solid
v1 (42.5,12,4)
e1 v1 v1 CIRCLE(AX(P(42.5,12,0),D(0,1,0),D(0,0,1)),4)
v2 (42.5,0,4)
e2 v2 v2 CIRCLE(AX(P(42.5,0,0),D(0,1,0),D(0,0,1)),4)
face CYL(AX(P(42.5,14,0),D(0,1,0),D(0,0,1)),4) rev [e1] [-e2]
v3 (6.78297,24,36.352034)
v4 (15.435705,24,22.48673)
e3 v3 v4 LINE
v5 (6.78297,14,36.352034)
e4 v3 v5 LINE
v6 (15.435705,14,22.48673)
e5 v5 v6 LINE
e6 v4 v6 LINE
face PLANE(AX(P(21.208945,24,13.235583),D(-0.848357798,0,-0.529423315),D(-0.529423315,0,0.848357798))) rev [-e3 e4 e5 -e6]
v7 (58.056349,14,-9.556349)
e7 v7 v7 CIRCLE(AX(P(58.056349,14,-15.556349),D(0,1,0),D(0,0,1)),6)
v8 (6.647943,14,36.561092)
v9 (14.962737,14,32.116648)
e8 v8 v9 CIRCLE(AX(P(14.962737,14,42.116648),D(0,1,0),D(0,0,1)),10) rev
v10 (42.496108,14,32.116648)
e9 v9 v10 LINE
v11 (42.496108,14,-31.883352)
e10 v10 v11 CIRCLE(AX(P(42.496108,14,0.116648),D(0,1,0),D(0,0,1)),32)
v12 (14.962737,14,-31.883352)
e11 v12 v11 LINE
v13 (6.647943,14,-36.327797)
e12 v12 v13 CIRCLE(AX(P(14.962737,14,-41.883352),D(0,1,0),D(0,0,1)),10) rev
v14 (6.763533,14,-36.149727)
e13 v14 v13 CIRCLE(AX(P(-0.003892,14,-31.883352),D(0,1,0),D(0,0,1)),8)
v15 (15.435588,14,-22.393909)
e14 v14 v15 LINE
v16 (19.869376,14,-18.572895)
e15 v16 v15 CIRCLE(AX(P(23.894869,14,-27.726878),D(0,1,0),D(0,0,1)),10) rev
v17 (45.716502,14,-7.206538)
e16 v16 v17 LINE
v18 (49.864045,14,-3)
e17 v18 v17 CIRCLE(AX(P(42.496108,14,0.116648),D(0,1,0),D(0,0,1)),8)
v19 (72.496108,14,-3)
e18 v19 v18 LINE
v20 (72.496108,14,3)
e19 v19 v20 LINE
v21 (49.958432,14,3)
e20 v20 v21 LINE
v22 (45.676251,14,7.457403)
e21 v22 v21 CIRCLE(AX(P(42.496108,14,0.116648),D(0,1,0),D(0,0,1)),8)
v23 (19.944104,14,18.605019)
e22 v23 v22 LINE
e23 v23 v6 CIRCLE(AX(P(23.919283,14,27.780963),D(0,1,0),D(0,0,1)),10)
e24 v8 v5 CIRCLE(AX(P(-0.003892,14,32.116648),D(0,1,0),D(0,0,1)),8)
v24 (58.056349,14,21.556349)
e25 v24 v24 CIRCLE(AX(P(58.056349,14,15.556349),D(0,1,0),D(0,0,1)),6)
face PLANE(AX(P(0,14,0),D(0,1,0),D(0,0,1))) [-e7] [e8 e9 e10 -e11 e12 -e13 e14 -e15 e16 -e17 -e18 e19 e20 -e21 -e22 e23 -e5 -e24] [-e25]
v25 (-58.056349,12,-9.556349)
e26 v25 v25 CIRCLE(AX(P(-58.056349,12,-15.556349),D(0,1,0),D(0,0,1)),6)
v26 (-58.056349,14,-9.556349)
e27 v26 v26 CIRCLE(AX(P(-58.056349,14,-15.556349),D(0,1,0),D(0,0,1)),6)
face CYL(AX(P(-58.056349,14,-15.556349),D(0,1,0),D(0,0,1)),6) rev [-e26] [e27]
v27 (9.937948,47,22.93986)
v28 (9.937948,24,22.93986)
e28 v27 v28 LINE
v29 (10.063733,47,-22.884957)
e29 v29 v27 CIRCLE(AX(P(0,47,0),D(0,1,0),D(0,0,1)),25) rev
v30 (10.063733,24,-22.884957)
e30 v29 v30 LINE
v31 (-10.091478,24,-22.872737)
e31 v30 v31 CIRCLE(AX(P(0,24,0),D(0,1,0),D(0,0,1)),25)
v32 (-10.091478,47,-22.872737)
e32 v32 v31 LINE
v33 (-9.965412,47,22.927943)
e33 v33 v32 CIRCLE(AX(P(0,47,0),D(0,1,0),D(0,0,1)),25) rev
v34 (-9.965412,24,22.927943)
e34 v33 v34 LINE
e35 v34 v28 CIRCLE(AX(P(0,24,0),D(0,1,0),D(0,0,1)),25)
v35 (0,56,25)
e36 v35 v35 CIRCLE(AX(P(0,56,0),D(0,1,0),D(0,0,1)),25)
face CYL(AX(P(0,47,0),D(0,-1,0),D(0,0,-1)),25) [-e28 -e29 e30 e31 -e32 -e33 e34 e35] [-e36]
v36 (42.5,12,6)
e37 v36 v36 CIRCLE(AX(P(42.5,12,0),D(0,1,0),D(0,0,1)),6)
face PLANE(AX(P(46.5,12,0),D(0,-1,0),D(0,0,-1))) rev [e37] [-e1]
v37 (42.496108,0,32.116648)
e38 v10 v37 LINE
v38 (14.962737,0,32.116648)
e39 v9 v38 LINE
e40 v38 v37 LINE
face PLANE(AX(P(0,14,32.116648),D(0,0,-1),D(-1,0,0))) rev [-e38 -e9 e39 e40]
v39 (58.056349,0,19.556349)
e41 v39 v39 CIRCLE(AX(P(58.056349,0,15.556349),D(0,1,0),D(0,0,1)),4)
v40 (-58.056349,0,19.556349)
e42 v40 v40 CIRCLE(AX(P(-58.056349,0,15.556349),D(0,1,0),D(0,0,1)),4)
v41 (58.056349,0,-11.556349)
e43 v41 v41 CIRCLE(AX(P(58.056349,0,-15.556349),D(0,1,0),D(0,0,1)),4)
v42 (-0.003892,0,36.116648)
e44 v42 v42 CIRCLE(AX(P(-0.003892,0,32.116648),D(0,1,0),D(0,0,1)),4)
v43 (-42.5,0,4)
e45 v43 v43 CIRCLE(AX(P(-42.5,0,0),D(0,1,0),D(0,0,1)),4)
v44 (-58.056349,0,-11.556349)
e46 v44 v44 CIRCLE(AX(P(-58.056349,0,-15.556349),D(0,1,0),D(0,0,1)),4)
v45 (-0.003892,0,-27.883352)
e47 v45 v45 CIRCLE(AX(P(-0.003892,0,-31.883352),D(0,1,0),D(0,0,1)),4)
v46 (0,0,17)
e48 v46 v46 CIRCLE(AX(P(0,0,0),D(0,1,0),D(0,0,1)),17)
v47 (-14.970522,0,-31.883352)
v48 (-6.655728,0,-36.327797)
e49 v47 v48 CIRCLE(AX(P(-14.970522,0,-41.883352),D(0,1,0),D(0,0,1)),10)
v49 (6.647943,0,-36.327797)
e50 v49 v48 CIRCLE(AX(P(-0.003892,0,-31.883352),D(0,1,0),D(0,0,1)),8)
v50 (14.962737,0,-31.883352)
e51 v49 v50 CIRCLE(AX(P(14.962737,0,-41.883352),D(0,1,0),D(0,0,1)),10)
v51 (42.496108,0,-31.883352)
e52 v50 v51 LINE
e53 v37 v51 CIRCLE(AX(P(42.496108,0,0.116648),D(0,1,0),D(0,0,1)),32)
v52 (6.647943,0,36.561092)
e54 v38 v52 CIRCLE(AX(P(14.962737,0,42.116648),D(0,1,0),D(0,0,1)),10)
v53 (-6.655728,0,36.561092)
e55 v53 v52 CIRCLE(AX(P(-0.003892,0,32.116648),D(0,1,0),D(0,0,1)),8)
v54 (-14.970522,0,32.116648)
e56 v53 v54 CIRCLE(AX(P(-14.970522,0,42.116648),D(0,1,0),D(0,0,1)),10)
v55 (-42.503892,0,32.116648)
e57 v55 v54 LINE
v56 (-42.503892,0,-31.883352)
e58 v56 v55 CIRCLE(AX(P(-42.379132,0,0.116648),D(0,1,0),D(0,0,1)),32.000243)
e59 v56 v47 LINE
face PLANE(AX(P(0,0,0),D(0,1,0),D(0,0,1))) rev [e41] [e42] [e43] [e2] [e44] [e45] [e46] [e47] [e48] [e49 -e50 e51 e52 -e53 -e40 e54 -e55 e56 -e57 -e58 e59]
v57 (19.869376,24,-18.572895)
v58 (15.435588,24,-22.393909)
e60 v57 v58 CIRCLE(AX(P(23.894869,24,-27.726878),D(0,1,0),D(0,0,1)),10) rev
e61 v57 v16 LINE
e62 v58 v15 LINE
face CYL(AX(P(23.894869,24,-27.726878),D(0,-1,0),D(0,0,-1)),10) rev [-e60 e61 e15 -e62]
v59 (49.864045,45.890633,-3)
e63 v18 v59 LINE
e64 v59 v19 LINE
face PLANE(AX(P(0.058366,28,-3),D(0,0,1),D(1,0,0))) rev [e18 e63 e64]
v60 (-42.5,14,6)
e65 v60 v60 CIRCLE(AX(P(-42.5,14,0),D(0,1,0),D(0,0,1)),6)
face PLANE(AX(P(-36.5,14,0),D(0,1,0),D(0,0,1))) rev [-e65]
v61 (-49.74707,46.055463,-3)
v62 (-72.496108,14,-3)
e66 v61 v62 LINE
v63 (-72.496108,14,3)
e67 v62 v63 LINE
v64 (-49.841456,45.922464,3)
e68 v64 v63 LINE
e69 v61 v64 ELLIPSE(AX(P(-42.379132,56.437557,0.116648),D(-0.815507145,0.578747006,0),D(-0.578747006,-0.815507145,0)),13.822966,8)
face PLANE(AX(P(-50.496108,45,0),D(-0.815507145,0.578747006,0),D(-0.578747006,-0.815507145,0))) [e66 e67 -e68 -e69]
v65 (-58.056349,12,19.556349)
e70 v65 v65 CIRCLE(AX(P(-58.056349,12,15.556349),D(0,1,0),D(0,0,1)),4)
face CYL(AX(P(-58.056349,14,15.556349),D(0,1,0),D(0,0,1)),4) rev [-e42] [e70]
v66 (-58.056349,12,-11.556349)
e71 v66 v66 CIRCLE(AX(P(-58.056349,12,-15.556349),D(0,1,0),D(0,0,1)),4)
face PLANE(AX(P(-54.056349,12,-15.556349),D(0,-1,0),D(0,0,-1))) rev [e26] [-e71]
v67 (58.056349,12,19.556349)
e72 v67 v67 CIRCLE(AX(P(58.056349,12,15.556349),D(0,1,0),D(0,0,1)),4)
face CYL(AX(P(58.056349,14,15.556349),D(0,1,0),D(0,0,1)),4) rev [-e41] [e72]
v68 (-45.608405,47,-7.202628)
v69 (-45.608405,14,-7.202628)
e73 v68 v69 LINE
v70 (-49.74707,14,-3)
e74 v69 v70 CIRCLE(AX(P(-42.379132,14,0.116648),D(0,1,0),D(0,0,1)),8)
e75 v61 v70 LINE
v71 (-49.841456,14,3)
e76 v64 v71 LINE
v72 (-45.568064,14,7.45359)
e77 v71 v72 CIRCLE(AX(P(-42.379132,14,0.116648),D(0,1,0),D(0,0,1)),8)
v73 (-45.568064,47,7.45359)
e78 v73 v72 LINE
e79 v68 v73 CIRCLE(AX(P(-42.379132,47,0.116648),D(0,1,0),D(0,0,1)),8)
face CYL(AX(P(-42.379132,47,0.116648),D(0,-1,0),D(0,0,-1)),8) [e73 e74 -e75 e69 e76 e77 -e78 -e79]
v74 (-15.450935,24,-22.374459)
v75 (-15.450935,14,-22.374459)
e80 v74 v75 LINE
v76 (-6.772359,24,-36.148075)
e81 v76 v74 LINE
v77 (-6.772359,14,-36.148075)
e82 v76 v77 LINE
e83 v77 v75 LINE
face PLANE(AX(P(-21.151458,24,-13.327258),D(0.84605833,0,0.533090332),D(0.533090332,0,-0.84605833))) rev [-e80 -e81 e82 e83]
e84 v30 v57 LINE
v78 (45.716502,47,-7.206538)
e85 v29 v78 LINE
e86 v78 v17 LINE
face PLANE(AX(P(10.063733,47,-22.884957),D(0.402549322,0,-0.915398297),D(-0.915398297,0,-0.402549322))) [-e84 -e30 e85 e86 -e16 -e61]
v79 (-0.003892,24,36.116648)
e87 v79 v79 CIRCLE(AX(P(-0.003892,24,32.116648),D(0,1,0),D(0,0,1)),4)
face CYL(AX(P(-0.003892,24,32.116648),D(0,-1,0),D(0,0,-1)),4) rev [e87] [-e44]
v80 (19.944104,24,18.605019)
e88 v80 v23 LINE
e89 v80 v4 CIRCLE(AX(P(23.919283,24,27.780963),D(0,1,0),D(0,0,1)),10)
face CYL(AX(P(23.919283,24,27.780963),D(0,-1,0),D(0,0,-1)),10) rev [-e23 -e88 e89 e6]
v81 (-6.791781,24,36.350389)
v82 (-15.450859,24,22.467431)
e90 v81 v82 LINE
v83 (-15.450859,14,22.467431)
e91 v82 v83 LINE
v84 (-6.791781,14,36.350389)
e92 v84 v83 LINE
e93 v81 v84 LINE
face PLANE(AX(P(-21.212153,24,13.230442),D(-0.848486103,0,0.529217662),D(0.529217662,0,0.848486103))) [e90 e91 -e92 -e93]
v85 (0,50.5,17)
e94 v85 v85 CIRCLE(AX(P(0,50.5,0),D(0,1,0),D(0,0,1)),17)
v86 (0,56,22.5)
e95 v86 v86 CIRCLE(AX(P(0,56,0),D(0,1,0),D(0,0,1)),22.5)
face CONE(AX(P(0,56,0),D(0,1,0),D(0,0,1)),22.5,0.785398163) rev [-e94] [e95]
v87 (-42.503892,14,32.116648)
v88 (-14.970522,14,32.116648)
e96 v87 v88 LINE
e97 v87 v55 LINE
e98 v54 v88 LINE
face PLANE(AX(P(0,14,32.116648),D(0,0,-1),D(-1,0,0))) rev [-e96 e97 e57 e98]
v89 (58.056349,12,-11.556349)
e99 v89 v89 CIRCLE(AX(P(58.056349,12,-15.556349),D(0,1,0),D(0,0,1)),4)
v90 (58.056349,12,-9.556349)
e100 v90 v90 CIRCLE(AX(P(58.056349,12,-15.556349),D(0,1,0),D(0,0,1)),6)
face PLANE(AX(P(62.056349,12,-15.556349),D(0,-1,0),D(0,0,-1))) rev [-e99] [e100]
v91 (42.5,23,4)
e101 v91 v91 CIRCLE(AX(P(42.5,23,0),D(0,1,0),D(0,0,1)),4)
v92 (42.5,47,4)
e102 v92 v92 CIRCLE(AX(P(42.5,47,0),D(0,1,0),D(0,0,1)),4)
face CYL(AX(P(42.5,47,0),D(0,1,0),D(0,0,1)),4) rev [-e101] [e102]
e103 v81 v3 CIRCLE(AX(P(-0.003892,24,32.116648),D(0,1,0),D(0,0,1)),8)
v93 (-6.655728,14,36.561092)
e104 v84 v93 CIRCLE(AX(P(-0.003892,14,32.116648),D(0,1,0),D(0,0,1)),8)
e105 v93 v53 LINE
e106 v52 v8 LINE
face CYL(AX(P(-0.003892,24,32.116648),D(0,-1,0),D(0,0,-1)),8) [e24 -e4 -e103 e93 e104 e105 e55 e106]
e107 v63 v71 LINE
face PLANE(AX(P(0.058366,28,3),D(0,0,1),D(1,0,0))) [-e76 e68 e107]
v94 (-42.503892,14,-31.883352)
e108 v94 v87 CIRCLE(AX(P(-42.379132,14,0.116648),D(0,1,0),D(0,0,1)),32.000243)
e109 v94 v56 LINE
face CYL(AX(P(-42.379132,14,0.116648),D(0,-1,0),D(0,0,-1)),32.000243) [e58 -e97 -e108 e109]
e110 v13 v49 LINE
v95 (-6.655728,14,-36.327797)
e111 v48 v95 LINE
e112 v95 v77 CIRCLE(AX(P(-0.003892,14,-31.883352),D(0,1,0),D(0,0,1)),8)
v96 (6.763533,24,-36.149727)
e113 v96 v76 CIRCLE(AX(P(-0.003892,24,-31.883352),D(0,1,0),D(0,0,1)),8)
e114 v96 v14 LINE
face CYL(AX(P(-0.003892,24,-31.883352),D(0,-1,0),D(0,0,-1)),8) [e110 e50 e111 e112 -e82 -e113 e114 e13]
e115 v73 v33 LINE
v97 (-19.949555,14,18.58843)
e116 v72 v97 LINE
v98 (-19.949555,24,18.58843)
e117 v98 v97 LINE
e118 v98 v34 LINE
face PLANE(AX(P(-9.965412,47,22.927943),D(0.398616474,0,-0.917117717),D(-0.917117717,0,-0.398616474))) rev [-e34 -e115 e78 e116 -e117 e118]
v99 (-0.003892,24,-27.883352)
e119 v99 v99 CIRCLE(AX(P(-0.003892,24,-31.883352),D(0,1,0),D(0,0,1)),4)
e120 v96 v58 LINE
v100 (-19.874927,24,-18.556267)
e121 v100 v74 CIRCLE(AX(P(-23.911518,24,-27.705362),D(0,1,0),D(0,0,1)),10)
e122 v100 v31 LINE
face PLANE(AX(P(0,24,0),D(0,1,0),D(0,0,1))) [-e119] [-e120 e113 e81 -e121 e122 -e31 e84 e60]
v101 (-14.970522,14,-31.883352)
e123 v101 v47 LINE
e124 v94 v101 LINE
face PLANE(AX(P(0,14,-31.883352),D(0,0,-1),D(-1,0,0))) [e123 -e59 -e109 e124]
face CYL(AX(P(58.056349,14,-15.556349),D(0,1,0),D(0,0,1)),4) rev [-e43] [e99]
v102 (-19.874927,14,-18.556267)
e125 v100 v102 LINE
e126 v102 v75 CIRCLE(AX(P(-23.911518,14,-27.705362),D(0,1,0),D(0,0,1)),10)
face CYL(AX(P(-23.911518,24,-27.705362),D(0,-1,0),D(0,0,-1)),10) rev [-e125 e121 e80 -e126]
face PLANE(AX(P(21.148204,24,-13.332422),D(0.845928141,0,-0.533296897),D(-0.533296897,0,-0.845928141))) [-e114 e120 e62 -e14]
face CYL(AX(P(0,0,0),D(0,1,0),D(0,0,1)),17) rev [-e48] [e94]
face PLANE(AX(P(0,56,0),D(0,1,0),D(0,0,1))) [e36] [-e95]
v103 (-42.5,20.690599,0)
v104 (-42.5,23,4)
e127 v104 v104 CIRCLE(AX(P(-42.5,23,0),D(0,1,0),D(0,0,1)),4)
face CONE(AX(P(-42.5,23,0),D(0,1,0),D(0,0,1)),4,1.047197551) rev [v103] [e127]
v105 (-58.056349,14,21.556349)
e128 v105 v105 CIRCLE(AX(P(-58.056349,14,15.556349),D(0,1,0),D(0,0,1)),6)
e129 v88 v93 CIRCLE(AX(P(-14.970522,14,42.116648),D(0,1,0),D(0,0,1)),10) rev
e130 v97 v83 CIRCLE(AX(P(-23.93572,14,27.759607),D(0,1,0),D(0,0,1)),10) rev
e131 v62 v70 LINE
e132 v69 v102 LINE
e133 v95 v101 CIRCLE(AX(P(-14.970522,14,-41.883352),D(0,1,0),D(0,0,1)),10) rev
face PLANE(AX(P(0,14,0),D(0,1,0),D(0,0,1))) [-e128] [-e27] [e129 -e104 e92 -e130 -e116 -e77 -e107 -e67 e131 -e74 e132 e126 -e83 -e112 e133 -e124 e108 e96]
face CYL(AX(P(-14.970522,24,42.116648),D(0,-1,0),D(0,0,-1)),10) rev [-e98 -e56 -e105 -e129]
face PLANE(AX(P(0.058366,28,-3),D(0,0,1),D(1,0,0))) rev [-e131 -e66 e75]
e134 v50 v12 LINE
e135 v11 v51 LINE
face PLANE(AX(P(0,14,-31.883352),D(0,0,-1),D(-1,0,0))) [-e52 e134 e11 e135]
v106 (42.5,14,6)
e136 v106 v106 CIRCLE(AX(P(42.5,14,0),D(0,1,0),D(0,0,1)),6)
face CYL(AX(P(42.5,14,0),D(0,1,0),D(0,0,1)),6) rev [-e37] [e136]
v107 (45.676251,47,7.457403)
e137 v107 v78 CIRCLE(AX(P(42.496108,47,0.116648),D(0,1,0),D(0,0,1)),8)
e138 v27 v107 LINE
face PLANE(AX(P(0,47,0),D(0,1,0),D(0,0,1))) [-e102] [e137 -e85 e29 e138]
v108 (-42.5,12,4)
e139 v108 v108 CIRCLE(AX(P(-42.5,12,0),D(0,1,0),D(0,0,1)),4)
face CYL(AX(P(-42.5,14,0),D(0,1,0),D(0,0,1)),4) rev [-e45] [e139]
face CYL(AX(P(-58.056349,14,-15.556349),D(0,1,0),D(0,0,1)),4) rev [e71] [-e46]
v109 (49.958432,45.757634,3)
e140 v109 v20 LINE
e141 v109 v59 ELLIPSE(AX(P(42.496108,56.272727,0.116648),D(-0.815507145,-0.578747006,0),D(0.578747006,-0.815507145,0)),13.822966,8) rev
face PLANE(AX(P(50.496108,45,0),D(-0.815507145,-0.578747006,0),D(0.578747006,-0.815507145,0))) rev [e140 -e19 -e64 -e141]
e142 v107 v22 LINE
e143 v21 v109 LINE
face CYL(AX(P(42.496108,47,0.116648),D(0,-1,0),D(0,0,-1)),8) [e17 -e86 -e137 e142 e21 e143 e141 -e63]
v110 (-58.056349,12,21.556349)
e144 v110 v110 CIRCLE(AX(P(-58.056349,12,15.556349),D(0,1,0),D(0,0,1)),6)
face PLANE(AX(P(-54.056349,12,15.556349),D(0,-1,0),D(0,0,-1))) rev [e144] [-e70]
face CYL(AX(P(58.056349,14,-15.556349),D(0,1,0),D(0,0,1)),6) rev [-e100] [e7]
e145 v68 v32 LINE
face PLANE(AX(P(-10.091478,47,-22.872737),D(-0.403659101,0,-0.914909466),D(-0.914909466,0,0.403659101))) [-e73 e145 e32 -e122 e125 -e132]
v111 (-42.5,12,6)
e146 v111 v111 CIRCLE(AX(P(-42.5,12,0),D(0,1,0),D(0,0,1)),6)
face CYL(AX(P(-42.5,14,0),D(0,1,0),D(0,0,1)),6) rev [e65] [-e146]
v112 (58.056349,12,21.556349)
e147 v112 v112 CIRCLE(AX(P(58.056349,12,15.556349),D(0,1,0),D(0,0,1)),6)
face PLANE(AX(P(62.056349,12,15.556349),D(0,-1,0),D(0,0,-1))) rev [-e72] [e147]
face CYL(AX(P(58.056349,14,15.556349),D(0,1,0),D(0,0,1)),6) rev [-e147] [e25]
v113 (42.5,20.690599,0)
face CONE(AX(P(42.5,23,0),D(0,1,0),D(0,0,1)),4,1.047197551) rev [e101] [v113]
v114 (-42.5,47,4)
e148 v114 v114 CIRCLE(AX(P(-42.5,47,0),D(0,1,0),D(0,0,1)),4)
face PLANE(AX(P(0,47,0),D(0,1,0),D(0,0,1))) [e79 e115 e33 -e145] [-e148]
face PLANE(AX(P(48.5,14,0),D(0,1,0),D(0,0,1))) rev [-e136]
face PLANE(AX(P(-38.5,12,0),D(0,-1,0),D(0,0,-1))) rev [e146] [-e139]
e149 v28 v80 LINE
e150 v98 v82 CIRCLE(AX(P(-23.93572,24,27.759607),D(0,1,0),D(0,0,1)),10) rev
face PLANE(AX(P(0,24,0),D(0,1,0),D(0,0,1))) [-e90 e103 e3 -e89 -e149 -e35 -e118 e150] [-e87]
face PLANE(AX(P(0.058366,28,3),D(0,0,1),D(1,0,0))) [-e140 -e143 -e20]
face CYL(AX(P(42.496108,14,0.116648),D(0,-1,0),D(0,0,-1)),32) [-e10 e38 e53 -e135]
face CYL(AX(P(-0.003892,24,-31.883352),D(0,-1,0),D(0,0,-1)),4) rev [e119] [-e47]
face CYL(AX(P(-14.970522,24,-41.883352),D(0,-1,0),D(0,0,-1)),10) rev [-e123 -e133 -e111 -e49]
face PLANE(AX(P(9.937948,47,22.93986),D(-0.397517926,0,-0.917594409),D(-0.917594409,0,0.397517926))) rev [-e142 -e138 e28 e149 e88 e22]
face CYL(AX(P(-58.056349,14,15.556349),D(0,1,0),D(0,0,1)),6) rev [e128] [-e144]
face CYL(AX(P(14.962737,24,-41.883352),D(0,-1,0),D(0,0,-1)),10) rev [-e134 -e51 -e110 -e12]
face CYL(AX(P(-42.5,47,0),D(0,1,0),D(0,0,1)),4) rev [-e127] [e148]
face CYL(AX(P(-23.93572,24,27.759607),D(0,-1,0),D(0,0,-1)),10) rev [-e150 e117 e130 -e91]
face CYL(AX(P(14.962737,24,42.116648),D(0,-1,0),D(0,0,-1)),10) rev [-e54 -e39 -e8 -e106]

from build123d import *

# Parameters (mm, degrees)
BOSS_EXTRUDE1_DEPTH                       = 14
BOSS_EXTRUDE1_2_DEPTH                     = 14
SKETCH1_3_R                               = 4
BOSS_EXTRUDE2_DEPTH                       = 24
BOSS_EXTRUDE3_DEPTH                       = 47
F_1_6_8_DIAMETER_HOLE1_D                  = 8
F_1_6_8_DIAMETER_HOLE1_DEPTH              = 24
F_1_6_8_DIAMETER_HOLE1_TIP                = 2.309401077
SKETCH1_9_R                               = 25
SKETCH1_9_R_2                             = 22.5
SKETCH1_9_R_3                             = 17
BOSS_EXTRUDE5_DEPTH                       = 56
SKETCH10_R                                = 22.5
CUT_EXTRUDE1_DEPTH                        = 5.5
CUT_EXTRUDE1_DRAFT                        = -45
CUT_EXTRUDE2_DEPTH                        = 102.464355703
CUT_EXTRUDE2_DEPTH_BACK                   = 102.464355703
SKETCH10_3_R                              = 17
RIB1_START                                = -3
RIB1_DEPTH                                = 6
CBORE_FOR_M6_HEX_HEAD_BOLT1_OUTLINE_R     = 4
CBORE_FOR_M6_HEX_HEAD_BOLT1_DEPTH         = 14
CBORE_START                               = 12
CBORE_FOR_M6_HEX_HEAD_BOLT1_2_OUTLINE_R   = 6
CBORE_FOR_M6_HEX_HEAD_BOLT1_2_OUTLINE_R_2 = 4
CBORE_FOR_M6_HEX_HEAD_BOLT1_2_DEPTH       = 2
FILLET1_R                                 = 10


# Read off the part's stored shape, not the designer's step: Rib1, CBORE for M6 Hex Head Bolt1
with BuildPart() as part:
    # Sketch1 → Boss-Extrude1 (new body)
    with BuildSketch(Plane(origin=(0, 0, 0), x_dir=(1, 0, 0), z_dir=(0, 1, 0))):
        with BuildLine():
            ThreePointArc((-42.503892458, 31.883352092), (-74.379375083, -0.116647908), (-42.503892458, -32.116647908))
            Line((-42.503892458, -32.116647908), (-9.432449948, -32.116647908))
            Line((-9.432449948, -32.116647908), (-15.450858564, -22.46743088))
            ThreePointArc((-15.450858564, -22.46743088), (-17.405537185, -20.186185698), (-19.949554848, -18.588430329))
            Line((-19.949554848, -18.588430329), (-45.568063673, -7.453589642))
            ThreePointArc((-45.568063673, -7.453589642), (-50.379101573, -0.138667702), (-45.608404686, 7.202627816))
            Line((-45.608404686, 7.202627816), (-19.874927427, 18.55626737))
            ThreePointArc((-19.874927427, 18.55626737), (-17.377799151, 20.134991341), (-15.450935137, 22.374458705))
            Line((-15.450935137, 22.374458705), (-9.459505287, 31.883352092))
            Line((-9.459505287, 31.883352092), (-42.503892458, 31.883352092))
        make_face()
    extrude(amount=BOSS_EXTRUDE1_DEPTH)



with BuildPart() as body_2:
    # Sketch1 → Boss-Extrude1 2 (new body)
    with BuildSketch(Plane(origin=(0, 0, 0), x_dir=(1, 0, 0), z_dir=(0, 1, 0))):
        with BuildLine():
            Line((15.435705448, -22.486729577), (9.426090996, -32.116647908))
            Line((9.426090996, -32.116647908), (42.496107542, -32.116647908))
            ThreePointArc((42.496107542, -32.116647908), (74.496107542, -0.116647908), (42.496107542, 31.883352092))
            Line((42.496107542, 31.883352092), (9.453175599, 31.883352092))
            Line((9.453175599, 31.883352092), (15.435587635, 22.393908747))
            ThreePointArc((15.435587635, 22.393908747), (17.36666589, 20.151749759), (19.869375819, 18.572894743))
            Line((19.869375819, 18.572894743), (45.716502121, 7.206538472))
            ThreePointArc((45.716502121, 7.206538472), (50.496077404, -0.13860709), (45.676250949, -7.457403176))
            Line((45.676250949, -7.457403176), (19.94410417, -18.605018641))
            ThreePointArc((19.94410417, -18.605018641), (17.39455524, -20.202841451), (15.435705448, -22.486729577))
        make_face()
    extrude(amount=BOSS_EXTRUDE1_2_DEPTH)


with BuildPart() as part_1:
    add(part.part)

    add(body_2.part)  # Boss-Extrude2 merges body 2
    # Sketch1<3> → Boss-Extrude2 (add)
    # profile 1 of 2: a face of its own
    with BuildSketch(Plane(origin=(0, 0, 0), x_dir=(1, 0, 0), z_dir=(0, 1, 0))):
        with BuildLine():
            Line((-15.450858564, -22.46743088), (-6.791781281, -36.350389201))
            ThreePointArc((-6.791781281, -36.350389201), (-0.004862038, -40.116647849), (6.782969927, -36.352034427))
            Line((6.782969927, -36.352034427), (15.435705448, -22.486729577))
            ThreePointArc((15.435705448, -22.486729577), (17.39455524, -20.202841451), (19.94410417, -18.605018641))
            Line((19.94410417, -18.605018641), (9.937948149, -22.939860213))
            ThreePointArc((9.937948149, -22.939860213), (-0.014968945, -24.999995519), (-9.96541186, -22.927942918))
            Line((-9.96541186, -22.927942918), (-19.949554848, -18.588430329))
            ThreePointArc((-19.949554848, -18.588430329), (-17.405537185, -20.186185698), (-15.450858564, -22.46743088))
        make_face()
        with Locations(Location((-0.003892458, -32.116647908, 0), (0, 0, 270))):
            Circle(SKETCH1_3_R, mode=Mode.SUBTRACT)
    # profile 2 of 2: a face of its own
    with BuildSketch(Plane(origin=(0, 0, 0), x_dir=(1, 0, 0), z_dir=(0, 1, 0))):
        with BuildLine():
            Line((-6.772359099, 36.148074748), (-15.450935137, 22.374458705))
            ThreePointArc((-15.450935137, 22.374458705), (-17.377799151, 20.134991341), (-19.874927427, 18.55626737))
            Line((-19.874927427, 18.55626737), (-10.091477525, 22.872736639))
            ThreePointArc((-10.091477525, 22.872736639), (-0.015158358, 24.999995404), (10.063733061, 22.884957437))
            Line((10.063733061, 22.884957437), (19.869375819, 18.572894743))
            ThreePointArc((19.869375819, 18.572894743), (17.36666589, 20.151749759), (15.435587635, 22.393908747))
            Line((15.435587635, 22.393908747), (6.763532669, 36.149727269))
            ThreePointArc((6.763532669, 36.149727269), (-0.004869133, 39.883352032), (-6.772359099, 36.148074748))
        make_face()
        with Locations(Location((-0.003892458, 31.883352092, 0), (0, 0, 270))):
            Circle(SKETCH1_3_R, mode=Mode.SUBTRACT)
    extrude(amount=BOSS_EXTRUDE2_DEPTH)

    # Sketch1<4> → Boss-Extrude3 (add)
    with BuildSketch(Plane(origin=(0, 0, 0), x_dir=(1, 0, 0), z_dir=(0, 1, 0))):
        with BuildLine():
            Line((-45.568063673, -7.453589642), (-9.96541186, -22.927942918))
            ThreePointArc((-9.96541186, -22.927942918), (-0.014968945, -24.999995519), (9.937948149, -22.939860213))
            Line((9.937948149, -22.939860213), (45.676250949, -7.457403176))
            ThreePointArc((45.676250949, -7.457403176), (50.496077404, -0.13860709), (45.716502121, 7.206538472))
            Line((45.716502121, 7.206538472), (10.063733061, 22.884957437))
            ThreePointArc((10.063733061, 22.884957437), (-0.015158358, 24.999995404), (-10.091477525, 22.872736639))
            Line((-10.091477525, 22.872736639), (-45.608404686, 7.202627816))
            ThreePointArc((-45.608404686, 7.202627816), (-50.379101573, -0.138667702), (-45.568063673, -7.453589642))
        make_face()
    extrude(amount=BOSS_EXTRUDE3_DEPTH)

    # Ø1.6 (8) Diameter Hole1
    with Locations(Plane(origin=(0, 47, 0), x_dir=(1, 0, 0), z_dir=(0, 1, 0))):
        with Locations((-42.5, 0), (42.5, 0)):
            Hole(F_1_6_8_DIAMETER_HOLE1_D / 2, depth=F_1_6_8_DIAMETER_HOLE1_DEPTH)
            with Locations((0, 0, -(F_1_6_8_DIAMETER_HOLE1_DEPTH + F_1_6_8_DIAMETER_HOLE1_TIP / 2))):  # 120° drill point
                Cone(0, F_1_6_8_DIAMETER_HOLE1_D / 2, F_1_6_8_DIAMETER_HOLE1_TIP, mode=Mode.SUBTRACT)

    # Sketch1<9> → Boss-Extrude5 (add)
    # profile 1 of 3: a face of its own
    with BuildSketch(Plane(origin=(0, 0, 0), x_dir=(1, 0, 0), z_dir=(0, 1, 0))):
        with Locations(Location((0, 0, 0), (0, 0, 66.262354029))):
            Circle(SKETCH1_9_R)
        Circle(SKETCH1_9_R_2, mode=Mode.SUBTRACT)
    # profile 2 of 3: a face of its own
    with BuildSketch(Plane(origin=(0, 0, 0), x_dir=(1, 0, 0), z_dir=(0, 1, 0))):
        Circle(SKETCH1_9_R_2)
        Circle(SKETCH1_9_R_3, mode=Mode.SUBTRACT)
    # profile 3 of 3: a face of its own
    with BuildSketch(Plane(origin=(0, 0, 0), x_dir=(1, 0, 0), z_dir=(0, 1, 0))):
        Circle(SKETCH1_9_R_3)
    extrude(amount=BOSS_EXTRUDE5_DEPTH)


with BuildPart() as cut_extrude1_tool:
    # Sketch10 → Cut-Extrude1 (with draft: the straight prism first)
    with BuildSketch(Plane(origin=(0, 56, 0), x_dir=(1, 0, 0), z_dir=(0, 1, 0))):
        Circle(SKETCH10_R)
    extrude(amount=-CUT_EXTRUDE1_DEPTH)
    # Cut-Extrude1: the draft: its side faces are tilted about the plane it starts from
    cut_extrude1_sides = [cut_extrude1_tool.faces().sort_by_distance(p)[0] for p in [
        (-22.5, 53.25, 0),
    ]]
    draft(cut_extrude1_sides, Plane(origin=(0, 56, 0), x_dir=(1, 0, 0), z_dir=(0, 1, 0)), CUT_EXTRUDE1_DRAFT)


with BuildPart() as part_2:
    add(part_1.part)

    # Cut-Extrude1: cut by cut_extrude1_tool
    add(cut_extrude1_tool.part, mode=Mode.SUBTRACT)

    # Sketch10<3> → Cut-Extrude2 (cut, two sides: drawn at the far end of the back side and taken through both)
    with BuildSketch(Plane(origin=(0, 56, 0), x_dir=(1, 0, 0), z_dir=(0, 1, 0)).offset(-CUT_EXTRUDE2_DEPTH_BACK)):
        with Locations(Location((0, 0, 0), (0, 0, 270))):
            Circle(SKETCH10_3_R)
    extrude(amount=CUT_EXTRUDE2_DEPTH + CUT_EXTRUDE2_DEPTH_BACK, mode=Mode.SUBTRACT)

    # Rib1 outline → Rib1 (add)
    with BuildSketch(Plane.XY.offset(RIB1_START)):
        Polygon((72.496107542, 14), (49.864045233, 45.890633254), (49.076752704, 47), (48, 47), (48, 14), align=None)
    rib1 = extrude(amount=RIB1_DEPTH)

    # Mirror1: Rib1 across plane
    add(rib1.mirror(Plane(origin=(0, 0, 0), x_dir=(0, 0, 1), z_dir=(1, 0, 0))))

    # CBORE for M6 Hex Head Bolt1 outline → CBORE for M6 Hex Head Bolt1 (cut)
    with BuildSketch(Plane(origin=(0, 0, 0), x_dir=(1, 0, 0), z_dir=(0, 1, 0))):
        with Locations((-42.5, 0)):
            Circle(CBORE_FOR_M6_HEX_HEAD_BOLT1_OUTLINE_R)
        with Locations((-58.056349186, 15.556349186)):
            Circle(CBORE_FOR_M6_HEX_HEAD_BOLT1_OUTLINE_R)
        with Locations((-58.056349186, -15.556349186)):
            Circle(CBORE_FOR_M6_HEX_HEAD_BOLT1_OUTLINE_R)
    cbore_for_m6_hex_head_bolt1 = extrude(amount=CBORE_FOR_M6_HEX_HEAD_BOLT1_DEPTH, mode=Mode.SUBTRACT)

    # CBORE for M6 Hex Head Bolt1 2 outline → CBORE for M6 Hex Head Bolt1 2 (cut)
    # profile 1 of 3: a face of its own
    with BuildSketch(Plane(origin=(0, 0, 0), x_dir=(1, 0, 0), z_dir=(0, 1, 0)).offset(CBORE_START)):
        with Locations((-42.5, 0)):
            Circle(CBORE_FOR_M6_HEX_HEAD_BOLT1_2_OUTLINE_R)
        with Locations((-42.5, 0)):
            Circle(CBORE_FOR_M6_HEX_HEAD_BOLT1_2_OUTLINE_R_2, mode=Mode.SUBTRACT)
    # profile 2 of 3: a face of its own
    with BuildSketch(Plane(origin=(0, 0, 0), x_dir=(1, 0, 0), z_dir=(0, 1, 0)).offset(CBORE_START)):
        with Locations((-58.056349186, 15.556349186)):
            Circle(CBORE_FOR_M6_HEX_HEAD_BOLT1_2_OUTLINE_R)
        with Locations((-58.056349186, 15.556349186)):
            Circle(CBORE_FOR_M6_HEX_HEAD_BOLT1_2_OUTLINE_R_2, mode=Mode.SUBTRACT)
    # profile 3 of 3: a face of its own
    with BuildSketch(Plane(origin=(0, 0, 0), x_dir=(1, 0, 0), z_dir=(0, 1, 0)).offset(CBORE_START)):
        with Locations((-58.056349186, -15.556349186)):
            Circle(CBORE_FOR_M6_HEX_HEAD_BOLT1_2_OUTLINE_R)
        with Locations((-58.056349186, -15.556349186)):
            Circle(CBORE_FOR_M6_HEX_HEAD_BOLT1_2_OUTLINE_R_2, mode=Mode.SUBTRACT)
    cbore_for_m6_hex_head_bolt1_2 = extrude(amount=CBORE_FOR_M6_HEX_HEAD_BOLT1_2_DEPTH, mode=Mode.SUBTRACT)

    # Mirror2: CBORE for M6 Hex Head Bolt1, CBORE for M6 Hex Head Bolt1 2 across plane
    add(cbore_for_m6_hex_head_bolt1.mirror(Plane(origin=(0, 0, 0), x_dir=(0, 0, 1), z_dir=(1, 0, 0))), mode=Mode.SUBTRACT)
    add(cbore_for_m6_hex_head_bolt1_2.mirror(Plane(origin=(0, 0, 0), x_dir=(0, 0, 1), z_dir=(1, 0, 0))), mode=Mode.SUBTRACT)

    # Fillet1
    # the kernel refuses this fillet: 10 mm, written as the material it adds along each edge
    with BuildSketch(Plane(origin=(-9.459505287, 0, -31.883352092), x_dir=(-1, 0, 0), z_dir=(0, 1, 0))) as fillet1_piece_1:
        with BuildLine():
            CenterArc((5.511016718, -10), FILLET1_R, 90, 56.251011404)
            Line((-2.803777475, -4.444444444), (-3.635256894, -3.888888889))
            ThreePointArc((-3.635256894, -3.888888889), (-3.533204519, -3.731632324), (-0.84605833, 0.533090332))
            Line((-0.84605833, 0.533090332), (0, 1))
            Line((0, 1), (5.511016718, 1))
            Line((5.511016718, 1), (5.511016718, 0))
        make_face()
    extrude(amount=14)
    with BuildSketch(Plane(origin=(9.453175599, 0, -31.883352092), x_dir=(-0.5337502052865287, 0, -0.8456421928668107), z_dir=(0, 1, 0))) as fillet1_piece_2:
        with BuildLine():
            CenterArc((5.515692353, -9.996619713), FILLET1_R, 91.489795541, 56.251011404)
            Line((-2.940729576, -4.65911766), (-3.786371769, -4.125367455))
            Line((-3.786371769, -4.125367455), (-0.845642193, 0.533750205))
            Line((-0.845642193, 0.533750205), (0.000535961, 0.999999856))
            ThreePointArc((0.000535961, 0.999999856), (5.043960288, 0.997296776), (5.22970437, 0.999661971))
            Line((5.22970437, 0.999661971), (5.255703277, 0))
        make_face()
    extrude(amount=14)
    with BuildSketch(Plane(origin=(-9.432449948, 0, 32.116647908), x_dir=(-1, 0, 0), z_dir=(0, 1, 0))) as fillet1_piece_3:
        with BuildLine():
            CenterArc((5.538072057, 10), FILLET1_R, 213.748988596, 56.251011404)
            Line((-2.776722136, 4.444444444), (-3.608201555, 3.888888889))
            ThreePointArc((-3.608201555, 3.888888889), (-3.48915477, 3.704523631), (-0.848486103, -0.529217662))
            Line((-0.848486103, -0.529217662), (0, -1))
            Line((0, -1), (5.538072057, -1))
            Line((5.538072057, -1), (5.538072057, 0))
        make_face()
    extrude(amount=14)
    with BuildSketch(Plane(origin=(9.426090996, 0, 32.116647908), x_dir=(-0.5300497469309569, 0, 0.8479665475585866), z_dir=(0, 1, 0))) as fillet1_piece_4:
        with BuildLine():
            CenterArc((5.544967615, 9.995388142), FILLET1_R, 212.008816089, 56.251011404)
            Line((-2.93469786, 4.694890672), (-3.782664408, 4.164840925))
            Line((-3.782664408, 4.164840925), (-0.847966548, -0.530049747))
            Line((-0.847966548, -0.530049747), (0.000738576, -0.999999727))
            ThreePointArc((0.000738576, -0.999999727), (4.993190313, -0.996312423), (5.210929838, -0.999538814))
            Line((5.210929838, -0.999538814), (5.241296909, 0))
        make_face()
    extrude(amount=14)


solid = part_2.part
